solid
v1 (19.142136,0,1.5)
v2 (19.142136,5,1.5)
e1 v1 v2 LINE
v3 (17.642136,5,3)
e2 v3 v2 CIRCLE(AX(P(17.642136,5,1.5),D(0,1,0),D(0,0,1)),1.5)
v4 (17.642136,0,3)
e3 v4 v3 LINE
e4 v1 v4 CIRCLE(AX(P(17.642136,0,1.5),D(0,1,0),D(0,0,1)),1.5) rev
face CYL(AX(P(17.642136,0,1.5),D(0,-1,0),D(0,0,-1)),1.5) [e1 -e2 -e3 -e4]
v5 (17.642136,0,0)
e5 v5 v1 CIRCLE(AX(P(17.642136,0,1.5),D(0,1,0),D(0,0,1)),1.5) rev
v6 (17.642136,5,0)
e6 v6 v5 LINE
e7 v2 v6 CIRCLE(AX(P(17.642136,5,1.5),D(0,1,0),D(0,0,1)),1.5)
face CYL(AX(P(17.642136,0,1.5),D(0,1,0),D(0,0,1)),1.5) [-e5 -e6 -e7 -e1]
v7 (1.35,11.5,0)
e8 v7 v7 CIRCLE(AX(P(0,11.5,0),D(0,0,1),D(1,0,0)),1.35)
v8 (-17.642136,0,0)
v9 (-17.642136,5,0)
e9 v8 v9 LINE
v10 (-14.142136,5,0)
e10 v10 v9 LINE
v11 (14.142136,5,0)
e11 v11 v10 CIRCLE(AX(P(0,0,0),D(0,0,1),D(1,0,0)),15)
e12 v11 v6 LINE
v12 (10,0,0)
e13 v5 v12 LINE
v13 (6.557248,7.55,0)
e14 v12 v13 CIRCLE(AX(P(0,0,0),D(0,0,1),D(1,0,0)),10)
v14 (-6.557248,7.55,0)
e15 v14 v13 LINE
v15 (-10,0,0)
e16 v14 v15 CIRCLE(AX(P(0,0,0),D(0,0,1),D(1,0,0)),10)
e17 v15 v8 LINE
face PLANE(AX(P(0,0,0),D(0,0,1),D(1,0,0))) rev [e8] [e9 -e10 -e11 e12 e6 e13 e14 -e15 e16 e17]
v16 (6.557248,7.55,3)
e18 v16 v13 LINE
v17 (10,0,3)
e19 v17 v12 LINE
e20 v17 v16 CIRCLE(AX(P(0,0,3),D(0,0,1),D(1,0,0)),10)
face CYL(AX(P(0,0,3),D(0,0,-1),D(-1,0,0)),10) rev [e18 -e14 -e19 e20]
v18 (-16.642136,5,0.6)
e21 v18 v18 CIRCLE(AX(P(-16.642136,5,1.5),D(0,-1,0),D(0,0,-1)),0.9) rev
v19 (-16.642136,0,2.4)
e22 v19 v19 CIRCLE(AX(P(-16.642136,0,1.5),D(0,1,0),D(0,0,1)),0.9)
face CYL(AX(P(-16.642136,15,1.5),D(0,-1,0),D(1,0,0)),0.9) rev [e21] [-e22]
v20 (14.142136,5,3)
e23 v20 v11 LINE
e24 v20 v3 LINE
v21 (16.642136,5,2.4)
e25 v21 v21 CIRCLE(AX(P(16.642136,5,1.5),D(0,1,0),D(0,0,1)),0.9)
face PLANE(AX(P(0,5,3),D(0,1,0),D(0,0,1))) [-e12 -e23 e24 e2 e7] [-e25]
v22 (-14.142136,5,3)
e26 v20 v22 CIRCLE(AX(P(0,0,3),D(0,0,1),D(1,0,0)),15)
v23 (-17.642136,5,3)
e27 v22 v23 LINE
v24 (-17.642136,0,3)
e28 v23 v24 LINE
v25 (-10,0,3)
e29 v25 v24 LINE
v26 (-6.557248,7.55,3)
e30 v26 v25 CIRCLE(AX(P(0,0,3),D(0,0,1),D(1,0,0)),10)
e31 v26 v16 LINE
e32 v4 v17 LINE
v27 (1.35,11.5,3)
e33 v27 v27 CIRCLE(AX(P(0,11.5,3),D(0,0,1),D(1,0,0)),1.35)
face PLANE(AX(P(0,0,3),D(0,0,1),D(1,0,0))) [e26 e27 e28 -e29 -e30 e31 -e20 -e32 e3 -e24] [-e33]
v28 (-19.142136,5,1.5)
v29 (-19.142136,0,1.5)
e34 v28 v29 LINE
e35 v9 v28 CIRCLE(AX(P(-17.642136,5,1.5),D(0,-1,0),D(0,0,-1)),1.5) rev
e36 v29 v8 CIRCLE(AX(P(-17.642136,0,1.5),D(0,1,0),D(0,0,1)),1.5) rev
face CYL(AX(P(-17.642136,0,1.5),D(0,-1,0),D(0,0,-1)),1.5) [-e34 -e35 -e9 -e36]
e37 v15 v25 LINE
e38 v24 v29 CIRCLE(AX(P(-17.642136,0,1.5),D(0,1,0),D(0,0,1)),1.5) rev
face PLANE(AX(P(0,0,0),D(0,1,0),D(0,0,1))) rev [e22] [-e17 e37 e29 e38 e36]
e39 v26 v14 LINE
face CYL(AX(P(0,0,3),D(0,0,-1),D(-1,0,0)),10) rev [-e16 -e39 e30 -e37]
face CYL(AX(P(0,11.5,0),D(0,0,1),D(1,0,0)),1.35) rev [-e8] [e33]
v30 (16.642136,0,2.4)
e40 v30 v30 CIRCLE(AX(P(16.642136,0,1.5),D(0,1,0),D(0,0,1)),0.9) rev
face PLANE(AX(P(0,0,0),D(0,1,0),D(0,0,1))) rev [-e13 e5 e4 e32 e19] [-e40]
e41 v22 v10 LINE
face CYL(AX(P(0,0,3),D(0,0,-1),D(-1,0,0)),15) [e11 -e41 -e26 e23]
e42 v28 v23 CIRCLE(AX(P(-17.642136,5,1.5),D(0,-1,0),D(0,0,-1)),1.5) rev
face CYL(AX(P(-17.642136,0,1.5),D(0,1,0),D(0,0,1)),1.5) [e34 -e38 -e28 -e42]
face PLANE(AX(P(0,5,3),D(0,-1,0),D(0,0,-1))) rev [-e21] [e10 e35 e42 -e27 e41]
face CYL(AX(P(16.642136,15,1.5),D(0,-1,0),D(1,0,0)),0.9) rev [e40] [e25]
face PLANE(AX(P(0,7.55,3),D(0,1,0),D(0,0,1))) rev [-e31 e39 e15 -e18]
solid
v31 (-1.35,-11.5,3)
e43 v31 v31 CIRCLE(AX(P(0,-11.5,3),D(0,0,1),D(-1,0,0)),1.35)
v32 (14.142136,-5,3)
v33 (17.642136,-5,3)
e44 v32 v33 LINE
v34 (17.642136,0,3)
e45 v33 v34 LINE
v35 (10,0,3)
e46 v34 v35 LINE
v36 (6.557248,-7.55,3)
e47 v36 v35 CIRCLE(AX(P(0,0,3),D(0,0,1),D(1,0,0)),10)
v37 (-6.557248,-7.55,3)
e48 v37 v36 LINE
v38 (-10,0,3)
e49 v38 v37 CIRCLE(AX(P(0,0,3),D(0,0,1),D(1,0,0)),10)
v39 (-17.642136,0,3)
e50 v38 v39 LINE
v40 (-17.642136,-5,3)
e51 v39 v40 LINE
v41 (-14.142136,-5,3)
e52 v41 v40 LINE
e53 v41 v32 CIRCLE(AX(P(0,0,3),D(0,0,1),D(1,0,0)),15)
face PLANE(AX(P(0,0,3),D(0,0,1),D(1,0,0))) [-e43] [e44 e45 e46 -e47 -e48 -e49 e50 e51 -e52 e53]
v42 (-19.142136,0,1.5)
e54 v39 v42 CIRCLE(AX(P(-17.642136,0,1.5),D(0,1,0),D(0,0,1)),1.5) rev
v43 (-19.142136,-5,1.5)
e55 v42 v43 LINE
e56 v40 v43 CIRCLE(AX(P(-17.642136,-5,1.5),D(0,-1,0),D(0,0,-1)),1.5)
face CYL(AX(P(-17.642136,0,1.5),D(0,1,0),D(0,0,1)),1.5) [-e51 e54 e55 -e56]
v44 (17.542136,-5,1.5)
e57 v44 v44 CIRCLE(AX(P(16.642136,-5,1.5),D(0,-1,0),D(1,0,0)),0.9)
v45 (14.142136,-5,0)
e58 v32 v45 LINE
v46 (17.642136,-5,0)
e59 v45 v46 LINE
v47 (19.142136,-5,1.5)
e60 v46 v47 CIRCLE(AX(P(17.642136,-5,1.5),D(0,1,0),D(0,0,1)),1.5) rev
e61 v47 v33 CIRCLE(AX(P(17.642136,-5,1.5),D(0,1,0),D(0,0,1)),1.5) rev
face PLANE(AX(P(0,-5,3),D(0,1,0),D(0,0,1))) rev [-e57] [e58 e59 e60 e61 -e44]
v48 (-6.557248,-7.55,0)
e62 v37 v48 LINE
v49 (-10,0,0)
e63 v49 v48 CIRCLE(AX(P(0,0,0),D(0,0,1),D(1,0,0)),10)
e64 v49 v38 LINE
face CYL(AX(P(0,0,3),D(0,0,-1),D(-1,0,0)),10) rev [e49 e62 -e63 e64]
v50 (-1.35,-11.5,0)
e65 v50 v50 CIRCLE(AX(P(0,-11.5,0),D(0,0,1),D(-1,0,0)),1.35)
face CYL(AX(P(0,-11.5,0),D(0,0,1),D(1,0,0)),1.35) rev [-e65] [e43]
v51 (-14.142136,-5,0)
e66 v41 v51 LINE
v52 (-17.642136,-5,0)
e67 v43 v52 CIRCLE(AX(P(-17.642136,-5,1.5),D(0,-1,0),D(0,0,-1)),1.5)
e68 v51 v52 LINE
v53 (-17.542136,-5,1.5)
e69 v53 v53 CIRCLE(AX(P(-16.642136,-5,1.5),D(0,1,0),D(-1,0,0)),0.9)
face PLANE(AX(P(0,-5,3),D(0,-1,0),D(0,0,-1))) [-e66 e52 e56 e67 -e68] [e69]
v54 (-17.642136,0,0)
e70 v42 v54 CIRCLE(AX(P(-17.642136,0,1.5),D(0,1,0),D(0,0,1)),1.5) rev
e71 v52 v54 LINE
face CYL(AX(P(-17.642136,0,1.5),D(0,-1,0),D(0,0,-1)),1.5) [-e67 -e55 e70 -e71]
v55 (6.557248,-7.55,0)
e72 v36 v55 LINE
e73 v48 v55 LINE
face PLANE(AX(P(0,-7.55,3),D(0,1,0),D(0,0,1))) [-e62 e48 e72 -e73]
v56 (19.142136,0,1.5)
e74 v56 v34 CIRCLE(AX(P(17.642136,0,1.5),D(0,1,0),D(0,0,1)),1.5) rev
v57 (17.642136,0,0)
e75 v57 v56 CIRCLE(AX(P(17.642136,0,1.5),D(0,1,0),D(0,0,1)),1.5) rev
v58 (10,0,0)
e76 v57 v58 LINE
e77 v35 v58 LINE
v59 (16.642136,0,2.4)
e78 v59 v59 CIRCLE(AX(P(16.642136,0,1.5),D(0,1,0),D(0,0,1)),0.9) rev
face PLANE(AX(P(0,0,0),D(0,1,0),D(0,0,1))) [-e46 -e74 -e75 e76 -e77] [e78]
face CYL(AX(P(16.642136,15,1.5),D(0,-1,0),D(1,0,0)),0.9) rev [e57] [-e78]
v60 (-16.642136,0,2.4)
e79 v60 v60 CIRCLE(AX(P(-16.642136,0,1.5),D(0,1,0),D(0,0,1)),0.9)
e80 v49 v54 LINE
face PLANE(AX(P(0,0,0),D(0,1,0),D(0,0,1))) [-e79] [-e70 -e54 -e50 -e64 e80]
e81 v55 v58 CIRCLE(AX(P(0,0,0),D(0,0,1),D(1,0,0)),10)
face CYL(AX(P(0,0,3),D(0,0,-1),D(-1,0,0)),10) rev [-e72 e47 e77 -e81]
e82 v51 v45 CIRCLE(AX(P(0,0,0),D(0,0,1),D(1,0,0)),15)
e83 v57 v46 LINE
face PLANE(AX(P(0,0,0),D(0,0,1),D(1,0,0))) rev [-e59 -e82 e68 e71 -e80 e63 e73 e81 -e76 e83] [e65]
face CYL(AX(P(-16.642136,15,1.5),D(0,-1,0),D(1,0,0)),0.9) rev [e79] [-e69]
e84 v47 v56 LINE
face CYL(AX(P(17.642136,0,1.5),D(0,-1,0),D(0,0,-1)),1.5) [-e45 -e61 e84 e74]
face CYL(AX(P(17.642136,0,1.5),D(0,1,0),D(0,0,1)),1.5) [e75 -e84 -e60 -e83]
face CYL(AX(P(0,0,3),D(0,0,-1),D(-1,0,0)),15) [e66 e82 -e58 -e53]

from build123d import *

# Parameters (mm, degrees)
SKETCH1_R           = 15
SKETCH1_R_2         = 10
BOSS_EXTRUDE1_DEPTH = 3
SKETCH2_R           = 0.9
CUT_EXTRUDE1_DEPTH  = 28.846388567
SKETCH3_R           = 1.35
CUT_EXTRUDE2_DEPTH  = 25.503496817
FILLET2_R           = 1.5


with BuildPart() as part:
    # Sketch1 → Boss-Extrude1 (new body)
    # profile 1 of 7: a face of its own
    with BuildSketch(Plane.XY):
        Circle(SKETCH1_R)
        Circle(SKETCH1_R_2, mode=Mode.SUBTRACT)
    # profile 2 of 7: a face of its own
    with BuildSketch(Plane.XY):
        with BuildLine():
            ThreePointArc((6.557247898, 7.55), (0, 10), (-6.557247898, 7.55))
            Line((-6.557247898, 7.55), (6.557247898, 7.55))
        make_face()
    # profile 3 of 7: a face of its own
    with BuildSketch(Plane.XY):
        with BuildLine():
            Line((6.557247898, -7.55), (-6.557247898, -7.55))
            ThreePointArc((-6.557247898, -7.55), (0, -10), (6.557247898, -7.55))
        make_face()
    # profile 4 of 7: a face of its own
    with BuildSketch(Plane.XY):
        with BuildLine():
            Line((19.142135624, 5), (14.142135624, 5))
            ThreePointArc((14.142135624, 5), (14.783978395, 2.536529681), (15, 0))
            ThreePointArc((15, 0), (14.783978395, -2.536529681), (14.142135624, -5))
            Line((14.142135624, -5), (19.142135624, -5))
            Line((19.142135624, -5), (19.142135624, 5))
        make_face()
    # profile 5 of 7: a face of its own
    with BuildSketch(Plane.XY):
        with BuildLine():
            ThreePointArc((15, 0), (14.783978395, 2.536529681), (14.142135624, 5))
            Line((14.142135624, 5), (14.142135624, -5))
            ThreePointArc((14.142135624, -5), (14.783978395, -2.536529681), (15, 0))
        make_face()
    # profile 6 of 7: a face of its own
    with BuildSketch(Plane.XY):
        with BuildLine():
            Line((-14.142135624, -5), (-14.142135624, 5))
            ThreePointArc((-14.142135624, 5), (-15, 0), (-14.142135624, -5))
        make_face()
    # profile 7 of 7: a face of its own
    with BuildSketch(Plane.XY):
        with BuildLine():
            ThreePointArc((-14.142135624, -5), (-15, 0), (-14.142135624, 5))
            Line((-14.142135624, 5), (-19.142135624, 5))
            Line((-19.142135624, 5), (-19.142135624, -5))
            Line((-19.142135624, -5), (-14.142135624, -5))
        make_face()
    extrude(amount=BOSS_EXTRUDE1_DEPTH)

    # Sketch2 → Cut-Extrude1 (cut, through all)
    with BuildSketch(Plane.XZ.offset(5)):
        with Locations((16.642135624, 1.5)):
            Circle(SKETCH2_R)
    cut_extrude1 = extrude(amount=-CUT_EXTRUDE1_DEPTH, mode=Mode.SUBTRACT)

    # Mirror1: Cut-Extrude1 across plane
    add(cut_extrude1.mirror(Plane(origin=(0, 0, 0), x_dir=(0, 0, 1), z_dir=(1, 0, 0))), mode=Mode.SUBTRACT)

    # Sketch3 → Cut-Extrude2 (cut, through all)
    with BuildSketch(Plane.XY.offset(3)):
        with Locations((0, 11.5)):
            Circle(SKETCH3_R)
        with Locations(Location((0, -11.5, 0), (0, 0, 180))):
            Circle(SKETCH3_R)
    extrude(amount=-CUT_EXTRUDE2_DEPTH, mode=Mode.SUBTRACT)

    # Fillet2
    fillet2_edges = [part.edges().sort_by_distance(p)[0] for p in [
        (19.142135624, 0, 3),
        (19.142135624, 0, 0),
        (-19.142135624, 0, 3),
        (-19.142135624, 0, 0),
    ]]
    fillet(fillet2_edges, radius=FILLET2_R - 0.0001)  # a hair under: the kernel refuses the full size


with BuildPart() as body_2:
    # Split1: the piece on the far side of the plane
    add(part.part)
    split(bisect_by=Plane.ZX, keep=Keep.BOTTOM)


with BuildPart() as part_1:
    add(part.part)

    # Split1
    split(bisect_by=Plane.ZX, keep=Keep.TOP)


solid = Compound([body_2.part, part_1.part])
